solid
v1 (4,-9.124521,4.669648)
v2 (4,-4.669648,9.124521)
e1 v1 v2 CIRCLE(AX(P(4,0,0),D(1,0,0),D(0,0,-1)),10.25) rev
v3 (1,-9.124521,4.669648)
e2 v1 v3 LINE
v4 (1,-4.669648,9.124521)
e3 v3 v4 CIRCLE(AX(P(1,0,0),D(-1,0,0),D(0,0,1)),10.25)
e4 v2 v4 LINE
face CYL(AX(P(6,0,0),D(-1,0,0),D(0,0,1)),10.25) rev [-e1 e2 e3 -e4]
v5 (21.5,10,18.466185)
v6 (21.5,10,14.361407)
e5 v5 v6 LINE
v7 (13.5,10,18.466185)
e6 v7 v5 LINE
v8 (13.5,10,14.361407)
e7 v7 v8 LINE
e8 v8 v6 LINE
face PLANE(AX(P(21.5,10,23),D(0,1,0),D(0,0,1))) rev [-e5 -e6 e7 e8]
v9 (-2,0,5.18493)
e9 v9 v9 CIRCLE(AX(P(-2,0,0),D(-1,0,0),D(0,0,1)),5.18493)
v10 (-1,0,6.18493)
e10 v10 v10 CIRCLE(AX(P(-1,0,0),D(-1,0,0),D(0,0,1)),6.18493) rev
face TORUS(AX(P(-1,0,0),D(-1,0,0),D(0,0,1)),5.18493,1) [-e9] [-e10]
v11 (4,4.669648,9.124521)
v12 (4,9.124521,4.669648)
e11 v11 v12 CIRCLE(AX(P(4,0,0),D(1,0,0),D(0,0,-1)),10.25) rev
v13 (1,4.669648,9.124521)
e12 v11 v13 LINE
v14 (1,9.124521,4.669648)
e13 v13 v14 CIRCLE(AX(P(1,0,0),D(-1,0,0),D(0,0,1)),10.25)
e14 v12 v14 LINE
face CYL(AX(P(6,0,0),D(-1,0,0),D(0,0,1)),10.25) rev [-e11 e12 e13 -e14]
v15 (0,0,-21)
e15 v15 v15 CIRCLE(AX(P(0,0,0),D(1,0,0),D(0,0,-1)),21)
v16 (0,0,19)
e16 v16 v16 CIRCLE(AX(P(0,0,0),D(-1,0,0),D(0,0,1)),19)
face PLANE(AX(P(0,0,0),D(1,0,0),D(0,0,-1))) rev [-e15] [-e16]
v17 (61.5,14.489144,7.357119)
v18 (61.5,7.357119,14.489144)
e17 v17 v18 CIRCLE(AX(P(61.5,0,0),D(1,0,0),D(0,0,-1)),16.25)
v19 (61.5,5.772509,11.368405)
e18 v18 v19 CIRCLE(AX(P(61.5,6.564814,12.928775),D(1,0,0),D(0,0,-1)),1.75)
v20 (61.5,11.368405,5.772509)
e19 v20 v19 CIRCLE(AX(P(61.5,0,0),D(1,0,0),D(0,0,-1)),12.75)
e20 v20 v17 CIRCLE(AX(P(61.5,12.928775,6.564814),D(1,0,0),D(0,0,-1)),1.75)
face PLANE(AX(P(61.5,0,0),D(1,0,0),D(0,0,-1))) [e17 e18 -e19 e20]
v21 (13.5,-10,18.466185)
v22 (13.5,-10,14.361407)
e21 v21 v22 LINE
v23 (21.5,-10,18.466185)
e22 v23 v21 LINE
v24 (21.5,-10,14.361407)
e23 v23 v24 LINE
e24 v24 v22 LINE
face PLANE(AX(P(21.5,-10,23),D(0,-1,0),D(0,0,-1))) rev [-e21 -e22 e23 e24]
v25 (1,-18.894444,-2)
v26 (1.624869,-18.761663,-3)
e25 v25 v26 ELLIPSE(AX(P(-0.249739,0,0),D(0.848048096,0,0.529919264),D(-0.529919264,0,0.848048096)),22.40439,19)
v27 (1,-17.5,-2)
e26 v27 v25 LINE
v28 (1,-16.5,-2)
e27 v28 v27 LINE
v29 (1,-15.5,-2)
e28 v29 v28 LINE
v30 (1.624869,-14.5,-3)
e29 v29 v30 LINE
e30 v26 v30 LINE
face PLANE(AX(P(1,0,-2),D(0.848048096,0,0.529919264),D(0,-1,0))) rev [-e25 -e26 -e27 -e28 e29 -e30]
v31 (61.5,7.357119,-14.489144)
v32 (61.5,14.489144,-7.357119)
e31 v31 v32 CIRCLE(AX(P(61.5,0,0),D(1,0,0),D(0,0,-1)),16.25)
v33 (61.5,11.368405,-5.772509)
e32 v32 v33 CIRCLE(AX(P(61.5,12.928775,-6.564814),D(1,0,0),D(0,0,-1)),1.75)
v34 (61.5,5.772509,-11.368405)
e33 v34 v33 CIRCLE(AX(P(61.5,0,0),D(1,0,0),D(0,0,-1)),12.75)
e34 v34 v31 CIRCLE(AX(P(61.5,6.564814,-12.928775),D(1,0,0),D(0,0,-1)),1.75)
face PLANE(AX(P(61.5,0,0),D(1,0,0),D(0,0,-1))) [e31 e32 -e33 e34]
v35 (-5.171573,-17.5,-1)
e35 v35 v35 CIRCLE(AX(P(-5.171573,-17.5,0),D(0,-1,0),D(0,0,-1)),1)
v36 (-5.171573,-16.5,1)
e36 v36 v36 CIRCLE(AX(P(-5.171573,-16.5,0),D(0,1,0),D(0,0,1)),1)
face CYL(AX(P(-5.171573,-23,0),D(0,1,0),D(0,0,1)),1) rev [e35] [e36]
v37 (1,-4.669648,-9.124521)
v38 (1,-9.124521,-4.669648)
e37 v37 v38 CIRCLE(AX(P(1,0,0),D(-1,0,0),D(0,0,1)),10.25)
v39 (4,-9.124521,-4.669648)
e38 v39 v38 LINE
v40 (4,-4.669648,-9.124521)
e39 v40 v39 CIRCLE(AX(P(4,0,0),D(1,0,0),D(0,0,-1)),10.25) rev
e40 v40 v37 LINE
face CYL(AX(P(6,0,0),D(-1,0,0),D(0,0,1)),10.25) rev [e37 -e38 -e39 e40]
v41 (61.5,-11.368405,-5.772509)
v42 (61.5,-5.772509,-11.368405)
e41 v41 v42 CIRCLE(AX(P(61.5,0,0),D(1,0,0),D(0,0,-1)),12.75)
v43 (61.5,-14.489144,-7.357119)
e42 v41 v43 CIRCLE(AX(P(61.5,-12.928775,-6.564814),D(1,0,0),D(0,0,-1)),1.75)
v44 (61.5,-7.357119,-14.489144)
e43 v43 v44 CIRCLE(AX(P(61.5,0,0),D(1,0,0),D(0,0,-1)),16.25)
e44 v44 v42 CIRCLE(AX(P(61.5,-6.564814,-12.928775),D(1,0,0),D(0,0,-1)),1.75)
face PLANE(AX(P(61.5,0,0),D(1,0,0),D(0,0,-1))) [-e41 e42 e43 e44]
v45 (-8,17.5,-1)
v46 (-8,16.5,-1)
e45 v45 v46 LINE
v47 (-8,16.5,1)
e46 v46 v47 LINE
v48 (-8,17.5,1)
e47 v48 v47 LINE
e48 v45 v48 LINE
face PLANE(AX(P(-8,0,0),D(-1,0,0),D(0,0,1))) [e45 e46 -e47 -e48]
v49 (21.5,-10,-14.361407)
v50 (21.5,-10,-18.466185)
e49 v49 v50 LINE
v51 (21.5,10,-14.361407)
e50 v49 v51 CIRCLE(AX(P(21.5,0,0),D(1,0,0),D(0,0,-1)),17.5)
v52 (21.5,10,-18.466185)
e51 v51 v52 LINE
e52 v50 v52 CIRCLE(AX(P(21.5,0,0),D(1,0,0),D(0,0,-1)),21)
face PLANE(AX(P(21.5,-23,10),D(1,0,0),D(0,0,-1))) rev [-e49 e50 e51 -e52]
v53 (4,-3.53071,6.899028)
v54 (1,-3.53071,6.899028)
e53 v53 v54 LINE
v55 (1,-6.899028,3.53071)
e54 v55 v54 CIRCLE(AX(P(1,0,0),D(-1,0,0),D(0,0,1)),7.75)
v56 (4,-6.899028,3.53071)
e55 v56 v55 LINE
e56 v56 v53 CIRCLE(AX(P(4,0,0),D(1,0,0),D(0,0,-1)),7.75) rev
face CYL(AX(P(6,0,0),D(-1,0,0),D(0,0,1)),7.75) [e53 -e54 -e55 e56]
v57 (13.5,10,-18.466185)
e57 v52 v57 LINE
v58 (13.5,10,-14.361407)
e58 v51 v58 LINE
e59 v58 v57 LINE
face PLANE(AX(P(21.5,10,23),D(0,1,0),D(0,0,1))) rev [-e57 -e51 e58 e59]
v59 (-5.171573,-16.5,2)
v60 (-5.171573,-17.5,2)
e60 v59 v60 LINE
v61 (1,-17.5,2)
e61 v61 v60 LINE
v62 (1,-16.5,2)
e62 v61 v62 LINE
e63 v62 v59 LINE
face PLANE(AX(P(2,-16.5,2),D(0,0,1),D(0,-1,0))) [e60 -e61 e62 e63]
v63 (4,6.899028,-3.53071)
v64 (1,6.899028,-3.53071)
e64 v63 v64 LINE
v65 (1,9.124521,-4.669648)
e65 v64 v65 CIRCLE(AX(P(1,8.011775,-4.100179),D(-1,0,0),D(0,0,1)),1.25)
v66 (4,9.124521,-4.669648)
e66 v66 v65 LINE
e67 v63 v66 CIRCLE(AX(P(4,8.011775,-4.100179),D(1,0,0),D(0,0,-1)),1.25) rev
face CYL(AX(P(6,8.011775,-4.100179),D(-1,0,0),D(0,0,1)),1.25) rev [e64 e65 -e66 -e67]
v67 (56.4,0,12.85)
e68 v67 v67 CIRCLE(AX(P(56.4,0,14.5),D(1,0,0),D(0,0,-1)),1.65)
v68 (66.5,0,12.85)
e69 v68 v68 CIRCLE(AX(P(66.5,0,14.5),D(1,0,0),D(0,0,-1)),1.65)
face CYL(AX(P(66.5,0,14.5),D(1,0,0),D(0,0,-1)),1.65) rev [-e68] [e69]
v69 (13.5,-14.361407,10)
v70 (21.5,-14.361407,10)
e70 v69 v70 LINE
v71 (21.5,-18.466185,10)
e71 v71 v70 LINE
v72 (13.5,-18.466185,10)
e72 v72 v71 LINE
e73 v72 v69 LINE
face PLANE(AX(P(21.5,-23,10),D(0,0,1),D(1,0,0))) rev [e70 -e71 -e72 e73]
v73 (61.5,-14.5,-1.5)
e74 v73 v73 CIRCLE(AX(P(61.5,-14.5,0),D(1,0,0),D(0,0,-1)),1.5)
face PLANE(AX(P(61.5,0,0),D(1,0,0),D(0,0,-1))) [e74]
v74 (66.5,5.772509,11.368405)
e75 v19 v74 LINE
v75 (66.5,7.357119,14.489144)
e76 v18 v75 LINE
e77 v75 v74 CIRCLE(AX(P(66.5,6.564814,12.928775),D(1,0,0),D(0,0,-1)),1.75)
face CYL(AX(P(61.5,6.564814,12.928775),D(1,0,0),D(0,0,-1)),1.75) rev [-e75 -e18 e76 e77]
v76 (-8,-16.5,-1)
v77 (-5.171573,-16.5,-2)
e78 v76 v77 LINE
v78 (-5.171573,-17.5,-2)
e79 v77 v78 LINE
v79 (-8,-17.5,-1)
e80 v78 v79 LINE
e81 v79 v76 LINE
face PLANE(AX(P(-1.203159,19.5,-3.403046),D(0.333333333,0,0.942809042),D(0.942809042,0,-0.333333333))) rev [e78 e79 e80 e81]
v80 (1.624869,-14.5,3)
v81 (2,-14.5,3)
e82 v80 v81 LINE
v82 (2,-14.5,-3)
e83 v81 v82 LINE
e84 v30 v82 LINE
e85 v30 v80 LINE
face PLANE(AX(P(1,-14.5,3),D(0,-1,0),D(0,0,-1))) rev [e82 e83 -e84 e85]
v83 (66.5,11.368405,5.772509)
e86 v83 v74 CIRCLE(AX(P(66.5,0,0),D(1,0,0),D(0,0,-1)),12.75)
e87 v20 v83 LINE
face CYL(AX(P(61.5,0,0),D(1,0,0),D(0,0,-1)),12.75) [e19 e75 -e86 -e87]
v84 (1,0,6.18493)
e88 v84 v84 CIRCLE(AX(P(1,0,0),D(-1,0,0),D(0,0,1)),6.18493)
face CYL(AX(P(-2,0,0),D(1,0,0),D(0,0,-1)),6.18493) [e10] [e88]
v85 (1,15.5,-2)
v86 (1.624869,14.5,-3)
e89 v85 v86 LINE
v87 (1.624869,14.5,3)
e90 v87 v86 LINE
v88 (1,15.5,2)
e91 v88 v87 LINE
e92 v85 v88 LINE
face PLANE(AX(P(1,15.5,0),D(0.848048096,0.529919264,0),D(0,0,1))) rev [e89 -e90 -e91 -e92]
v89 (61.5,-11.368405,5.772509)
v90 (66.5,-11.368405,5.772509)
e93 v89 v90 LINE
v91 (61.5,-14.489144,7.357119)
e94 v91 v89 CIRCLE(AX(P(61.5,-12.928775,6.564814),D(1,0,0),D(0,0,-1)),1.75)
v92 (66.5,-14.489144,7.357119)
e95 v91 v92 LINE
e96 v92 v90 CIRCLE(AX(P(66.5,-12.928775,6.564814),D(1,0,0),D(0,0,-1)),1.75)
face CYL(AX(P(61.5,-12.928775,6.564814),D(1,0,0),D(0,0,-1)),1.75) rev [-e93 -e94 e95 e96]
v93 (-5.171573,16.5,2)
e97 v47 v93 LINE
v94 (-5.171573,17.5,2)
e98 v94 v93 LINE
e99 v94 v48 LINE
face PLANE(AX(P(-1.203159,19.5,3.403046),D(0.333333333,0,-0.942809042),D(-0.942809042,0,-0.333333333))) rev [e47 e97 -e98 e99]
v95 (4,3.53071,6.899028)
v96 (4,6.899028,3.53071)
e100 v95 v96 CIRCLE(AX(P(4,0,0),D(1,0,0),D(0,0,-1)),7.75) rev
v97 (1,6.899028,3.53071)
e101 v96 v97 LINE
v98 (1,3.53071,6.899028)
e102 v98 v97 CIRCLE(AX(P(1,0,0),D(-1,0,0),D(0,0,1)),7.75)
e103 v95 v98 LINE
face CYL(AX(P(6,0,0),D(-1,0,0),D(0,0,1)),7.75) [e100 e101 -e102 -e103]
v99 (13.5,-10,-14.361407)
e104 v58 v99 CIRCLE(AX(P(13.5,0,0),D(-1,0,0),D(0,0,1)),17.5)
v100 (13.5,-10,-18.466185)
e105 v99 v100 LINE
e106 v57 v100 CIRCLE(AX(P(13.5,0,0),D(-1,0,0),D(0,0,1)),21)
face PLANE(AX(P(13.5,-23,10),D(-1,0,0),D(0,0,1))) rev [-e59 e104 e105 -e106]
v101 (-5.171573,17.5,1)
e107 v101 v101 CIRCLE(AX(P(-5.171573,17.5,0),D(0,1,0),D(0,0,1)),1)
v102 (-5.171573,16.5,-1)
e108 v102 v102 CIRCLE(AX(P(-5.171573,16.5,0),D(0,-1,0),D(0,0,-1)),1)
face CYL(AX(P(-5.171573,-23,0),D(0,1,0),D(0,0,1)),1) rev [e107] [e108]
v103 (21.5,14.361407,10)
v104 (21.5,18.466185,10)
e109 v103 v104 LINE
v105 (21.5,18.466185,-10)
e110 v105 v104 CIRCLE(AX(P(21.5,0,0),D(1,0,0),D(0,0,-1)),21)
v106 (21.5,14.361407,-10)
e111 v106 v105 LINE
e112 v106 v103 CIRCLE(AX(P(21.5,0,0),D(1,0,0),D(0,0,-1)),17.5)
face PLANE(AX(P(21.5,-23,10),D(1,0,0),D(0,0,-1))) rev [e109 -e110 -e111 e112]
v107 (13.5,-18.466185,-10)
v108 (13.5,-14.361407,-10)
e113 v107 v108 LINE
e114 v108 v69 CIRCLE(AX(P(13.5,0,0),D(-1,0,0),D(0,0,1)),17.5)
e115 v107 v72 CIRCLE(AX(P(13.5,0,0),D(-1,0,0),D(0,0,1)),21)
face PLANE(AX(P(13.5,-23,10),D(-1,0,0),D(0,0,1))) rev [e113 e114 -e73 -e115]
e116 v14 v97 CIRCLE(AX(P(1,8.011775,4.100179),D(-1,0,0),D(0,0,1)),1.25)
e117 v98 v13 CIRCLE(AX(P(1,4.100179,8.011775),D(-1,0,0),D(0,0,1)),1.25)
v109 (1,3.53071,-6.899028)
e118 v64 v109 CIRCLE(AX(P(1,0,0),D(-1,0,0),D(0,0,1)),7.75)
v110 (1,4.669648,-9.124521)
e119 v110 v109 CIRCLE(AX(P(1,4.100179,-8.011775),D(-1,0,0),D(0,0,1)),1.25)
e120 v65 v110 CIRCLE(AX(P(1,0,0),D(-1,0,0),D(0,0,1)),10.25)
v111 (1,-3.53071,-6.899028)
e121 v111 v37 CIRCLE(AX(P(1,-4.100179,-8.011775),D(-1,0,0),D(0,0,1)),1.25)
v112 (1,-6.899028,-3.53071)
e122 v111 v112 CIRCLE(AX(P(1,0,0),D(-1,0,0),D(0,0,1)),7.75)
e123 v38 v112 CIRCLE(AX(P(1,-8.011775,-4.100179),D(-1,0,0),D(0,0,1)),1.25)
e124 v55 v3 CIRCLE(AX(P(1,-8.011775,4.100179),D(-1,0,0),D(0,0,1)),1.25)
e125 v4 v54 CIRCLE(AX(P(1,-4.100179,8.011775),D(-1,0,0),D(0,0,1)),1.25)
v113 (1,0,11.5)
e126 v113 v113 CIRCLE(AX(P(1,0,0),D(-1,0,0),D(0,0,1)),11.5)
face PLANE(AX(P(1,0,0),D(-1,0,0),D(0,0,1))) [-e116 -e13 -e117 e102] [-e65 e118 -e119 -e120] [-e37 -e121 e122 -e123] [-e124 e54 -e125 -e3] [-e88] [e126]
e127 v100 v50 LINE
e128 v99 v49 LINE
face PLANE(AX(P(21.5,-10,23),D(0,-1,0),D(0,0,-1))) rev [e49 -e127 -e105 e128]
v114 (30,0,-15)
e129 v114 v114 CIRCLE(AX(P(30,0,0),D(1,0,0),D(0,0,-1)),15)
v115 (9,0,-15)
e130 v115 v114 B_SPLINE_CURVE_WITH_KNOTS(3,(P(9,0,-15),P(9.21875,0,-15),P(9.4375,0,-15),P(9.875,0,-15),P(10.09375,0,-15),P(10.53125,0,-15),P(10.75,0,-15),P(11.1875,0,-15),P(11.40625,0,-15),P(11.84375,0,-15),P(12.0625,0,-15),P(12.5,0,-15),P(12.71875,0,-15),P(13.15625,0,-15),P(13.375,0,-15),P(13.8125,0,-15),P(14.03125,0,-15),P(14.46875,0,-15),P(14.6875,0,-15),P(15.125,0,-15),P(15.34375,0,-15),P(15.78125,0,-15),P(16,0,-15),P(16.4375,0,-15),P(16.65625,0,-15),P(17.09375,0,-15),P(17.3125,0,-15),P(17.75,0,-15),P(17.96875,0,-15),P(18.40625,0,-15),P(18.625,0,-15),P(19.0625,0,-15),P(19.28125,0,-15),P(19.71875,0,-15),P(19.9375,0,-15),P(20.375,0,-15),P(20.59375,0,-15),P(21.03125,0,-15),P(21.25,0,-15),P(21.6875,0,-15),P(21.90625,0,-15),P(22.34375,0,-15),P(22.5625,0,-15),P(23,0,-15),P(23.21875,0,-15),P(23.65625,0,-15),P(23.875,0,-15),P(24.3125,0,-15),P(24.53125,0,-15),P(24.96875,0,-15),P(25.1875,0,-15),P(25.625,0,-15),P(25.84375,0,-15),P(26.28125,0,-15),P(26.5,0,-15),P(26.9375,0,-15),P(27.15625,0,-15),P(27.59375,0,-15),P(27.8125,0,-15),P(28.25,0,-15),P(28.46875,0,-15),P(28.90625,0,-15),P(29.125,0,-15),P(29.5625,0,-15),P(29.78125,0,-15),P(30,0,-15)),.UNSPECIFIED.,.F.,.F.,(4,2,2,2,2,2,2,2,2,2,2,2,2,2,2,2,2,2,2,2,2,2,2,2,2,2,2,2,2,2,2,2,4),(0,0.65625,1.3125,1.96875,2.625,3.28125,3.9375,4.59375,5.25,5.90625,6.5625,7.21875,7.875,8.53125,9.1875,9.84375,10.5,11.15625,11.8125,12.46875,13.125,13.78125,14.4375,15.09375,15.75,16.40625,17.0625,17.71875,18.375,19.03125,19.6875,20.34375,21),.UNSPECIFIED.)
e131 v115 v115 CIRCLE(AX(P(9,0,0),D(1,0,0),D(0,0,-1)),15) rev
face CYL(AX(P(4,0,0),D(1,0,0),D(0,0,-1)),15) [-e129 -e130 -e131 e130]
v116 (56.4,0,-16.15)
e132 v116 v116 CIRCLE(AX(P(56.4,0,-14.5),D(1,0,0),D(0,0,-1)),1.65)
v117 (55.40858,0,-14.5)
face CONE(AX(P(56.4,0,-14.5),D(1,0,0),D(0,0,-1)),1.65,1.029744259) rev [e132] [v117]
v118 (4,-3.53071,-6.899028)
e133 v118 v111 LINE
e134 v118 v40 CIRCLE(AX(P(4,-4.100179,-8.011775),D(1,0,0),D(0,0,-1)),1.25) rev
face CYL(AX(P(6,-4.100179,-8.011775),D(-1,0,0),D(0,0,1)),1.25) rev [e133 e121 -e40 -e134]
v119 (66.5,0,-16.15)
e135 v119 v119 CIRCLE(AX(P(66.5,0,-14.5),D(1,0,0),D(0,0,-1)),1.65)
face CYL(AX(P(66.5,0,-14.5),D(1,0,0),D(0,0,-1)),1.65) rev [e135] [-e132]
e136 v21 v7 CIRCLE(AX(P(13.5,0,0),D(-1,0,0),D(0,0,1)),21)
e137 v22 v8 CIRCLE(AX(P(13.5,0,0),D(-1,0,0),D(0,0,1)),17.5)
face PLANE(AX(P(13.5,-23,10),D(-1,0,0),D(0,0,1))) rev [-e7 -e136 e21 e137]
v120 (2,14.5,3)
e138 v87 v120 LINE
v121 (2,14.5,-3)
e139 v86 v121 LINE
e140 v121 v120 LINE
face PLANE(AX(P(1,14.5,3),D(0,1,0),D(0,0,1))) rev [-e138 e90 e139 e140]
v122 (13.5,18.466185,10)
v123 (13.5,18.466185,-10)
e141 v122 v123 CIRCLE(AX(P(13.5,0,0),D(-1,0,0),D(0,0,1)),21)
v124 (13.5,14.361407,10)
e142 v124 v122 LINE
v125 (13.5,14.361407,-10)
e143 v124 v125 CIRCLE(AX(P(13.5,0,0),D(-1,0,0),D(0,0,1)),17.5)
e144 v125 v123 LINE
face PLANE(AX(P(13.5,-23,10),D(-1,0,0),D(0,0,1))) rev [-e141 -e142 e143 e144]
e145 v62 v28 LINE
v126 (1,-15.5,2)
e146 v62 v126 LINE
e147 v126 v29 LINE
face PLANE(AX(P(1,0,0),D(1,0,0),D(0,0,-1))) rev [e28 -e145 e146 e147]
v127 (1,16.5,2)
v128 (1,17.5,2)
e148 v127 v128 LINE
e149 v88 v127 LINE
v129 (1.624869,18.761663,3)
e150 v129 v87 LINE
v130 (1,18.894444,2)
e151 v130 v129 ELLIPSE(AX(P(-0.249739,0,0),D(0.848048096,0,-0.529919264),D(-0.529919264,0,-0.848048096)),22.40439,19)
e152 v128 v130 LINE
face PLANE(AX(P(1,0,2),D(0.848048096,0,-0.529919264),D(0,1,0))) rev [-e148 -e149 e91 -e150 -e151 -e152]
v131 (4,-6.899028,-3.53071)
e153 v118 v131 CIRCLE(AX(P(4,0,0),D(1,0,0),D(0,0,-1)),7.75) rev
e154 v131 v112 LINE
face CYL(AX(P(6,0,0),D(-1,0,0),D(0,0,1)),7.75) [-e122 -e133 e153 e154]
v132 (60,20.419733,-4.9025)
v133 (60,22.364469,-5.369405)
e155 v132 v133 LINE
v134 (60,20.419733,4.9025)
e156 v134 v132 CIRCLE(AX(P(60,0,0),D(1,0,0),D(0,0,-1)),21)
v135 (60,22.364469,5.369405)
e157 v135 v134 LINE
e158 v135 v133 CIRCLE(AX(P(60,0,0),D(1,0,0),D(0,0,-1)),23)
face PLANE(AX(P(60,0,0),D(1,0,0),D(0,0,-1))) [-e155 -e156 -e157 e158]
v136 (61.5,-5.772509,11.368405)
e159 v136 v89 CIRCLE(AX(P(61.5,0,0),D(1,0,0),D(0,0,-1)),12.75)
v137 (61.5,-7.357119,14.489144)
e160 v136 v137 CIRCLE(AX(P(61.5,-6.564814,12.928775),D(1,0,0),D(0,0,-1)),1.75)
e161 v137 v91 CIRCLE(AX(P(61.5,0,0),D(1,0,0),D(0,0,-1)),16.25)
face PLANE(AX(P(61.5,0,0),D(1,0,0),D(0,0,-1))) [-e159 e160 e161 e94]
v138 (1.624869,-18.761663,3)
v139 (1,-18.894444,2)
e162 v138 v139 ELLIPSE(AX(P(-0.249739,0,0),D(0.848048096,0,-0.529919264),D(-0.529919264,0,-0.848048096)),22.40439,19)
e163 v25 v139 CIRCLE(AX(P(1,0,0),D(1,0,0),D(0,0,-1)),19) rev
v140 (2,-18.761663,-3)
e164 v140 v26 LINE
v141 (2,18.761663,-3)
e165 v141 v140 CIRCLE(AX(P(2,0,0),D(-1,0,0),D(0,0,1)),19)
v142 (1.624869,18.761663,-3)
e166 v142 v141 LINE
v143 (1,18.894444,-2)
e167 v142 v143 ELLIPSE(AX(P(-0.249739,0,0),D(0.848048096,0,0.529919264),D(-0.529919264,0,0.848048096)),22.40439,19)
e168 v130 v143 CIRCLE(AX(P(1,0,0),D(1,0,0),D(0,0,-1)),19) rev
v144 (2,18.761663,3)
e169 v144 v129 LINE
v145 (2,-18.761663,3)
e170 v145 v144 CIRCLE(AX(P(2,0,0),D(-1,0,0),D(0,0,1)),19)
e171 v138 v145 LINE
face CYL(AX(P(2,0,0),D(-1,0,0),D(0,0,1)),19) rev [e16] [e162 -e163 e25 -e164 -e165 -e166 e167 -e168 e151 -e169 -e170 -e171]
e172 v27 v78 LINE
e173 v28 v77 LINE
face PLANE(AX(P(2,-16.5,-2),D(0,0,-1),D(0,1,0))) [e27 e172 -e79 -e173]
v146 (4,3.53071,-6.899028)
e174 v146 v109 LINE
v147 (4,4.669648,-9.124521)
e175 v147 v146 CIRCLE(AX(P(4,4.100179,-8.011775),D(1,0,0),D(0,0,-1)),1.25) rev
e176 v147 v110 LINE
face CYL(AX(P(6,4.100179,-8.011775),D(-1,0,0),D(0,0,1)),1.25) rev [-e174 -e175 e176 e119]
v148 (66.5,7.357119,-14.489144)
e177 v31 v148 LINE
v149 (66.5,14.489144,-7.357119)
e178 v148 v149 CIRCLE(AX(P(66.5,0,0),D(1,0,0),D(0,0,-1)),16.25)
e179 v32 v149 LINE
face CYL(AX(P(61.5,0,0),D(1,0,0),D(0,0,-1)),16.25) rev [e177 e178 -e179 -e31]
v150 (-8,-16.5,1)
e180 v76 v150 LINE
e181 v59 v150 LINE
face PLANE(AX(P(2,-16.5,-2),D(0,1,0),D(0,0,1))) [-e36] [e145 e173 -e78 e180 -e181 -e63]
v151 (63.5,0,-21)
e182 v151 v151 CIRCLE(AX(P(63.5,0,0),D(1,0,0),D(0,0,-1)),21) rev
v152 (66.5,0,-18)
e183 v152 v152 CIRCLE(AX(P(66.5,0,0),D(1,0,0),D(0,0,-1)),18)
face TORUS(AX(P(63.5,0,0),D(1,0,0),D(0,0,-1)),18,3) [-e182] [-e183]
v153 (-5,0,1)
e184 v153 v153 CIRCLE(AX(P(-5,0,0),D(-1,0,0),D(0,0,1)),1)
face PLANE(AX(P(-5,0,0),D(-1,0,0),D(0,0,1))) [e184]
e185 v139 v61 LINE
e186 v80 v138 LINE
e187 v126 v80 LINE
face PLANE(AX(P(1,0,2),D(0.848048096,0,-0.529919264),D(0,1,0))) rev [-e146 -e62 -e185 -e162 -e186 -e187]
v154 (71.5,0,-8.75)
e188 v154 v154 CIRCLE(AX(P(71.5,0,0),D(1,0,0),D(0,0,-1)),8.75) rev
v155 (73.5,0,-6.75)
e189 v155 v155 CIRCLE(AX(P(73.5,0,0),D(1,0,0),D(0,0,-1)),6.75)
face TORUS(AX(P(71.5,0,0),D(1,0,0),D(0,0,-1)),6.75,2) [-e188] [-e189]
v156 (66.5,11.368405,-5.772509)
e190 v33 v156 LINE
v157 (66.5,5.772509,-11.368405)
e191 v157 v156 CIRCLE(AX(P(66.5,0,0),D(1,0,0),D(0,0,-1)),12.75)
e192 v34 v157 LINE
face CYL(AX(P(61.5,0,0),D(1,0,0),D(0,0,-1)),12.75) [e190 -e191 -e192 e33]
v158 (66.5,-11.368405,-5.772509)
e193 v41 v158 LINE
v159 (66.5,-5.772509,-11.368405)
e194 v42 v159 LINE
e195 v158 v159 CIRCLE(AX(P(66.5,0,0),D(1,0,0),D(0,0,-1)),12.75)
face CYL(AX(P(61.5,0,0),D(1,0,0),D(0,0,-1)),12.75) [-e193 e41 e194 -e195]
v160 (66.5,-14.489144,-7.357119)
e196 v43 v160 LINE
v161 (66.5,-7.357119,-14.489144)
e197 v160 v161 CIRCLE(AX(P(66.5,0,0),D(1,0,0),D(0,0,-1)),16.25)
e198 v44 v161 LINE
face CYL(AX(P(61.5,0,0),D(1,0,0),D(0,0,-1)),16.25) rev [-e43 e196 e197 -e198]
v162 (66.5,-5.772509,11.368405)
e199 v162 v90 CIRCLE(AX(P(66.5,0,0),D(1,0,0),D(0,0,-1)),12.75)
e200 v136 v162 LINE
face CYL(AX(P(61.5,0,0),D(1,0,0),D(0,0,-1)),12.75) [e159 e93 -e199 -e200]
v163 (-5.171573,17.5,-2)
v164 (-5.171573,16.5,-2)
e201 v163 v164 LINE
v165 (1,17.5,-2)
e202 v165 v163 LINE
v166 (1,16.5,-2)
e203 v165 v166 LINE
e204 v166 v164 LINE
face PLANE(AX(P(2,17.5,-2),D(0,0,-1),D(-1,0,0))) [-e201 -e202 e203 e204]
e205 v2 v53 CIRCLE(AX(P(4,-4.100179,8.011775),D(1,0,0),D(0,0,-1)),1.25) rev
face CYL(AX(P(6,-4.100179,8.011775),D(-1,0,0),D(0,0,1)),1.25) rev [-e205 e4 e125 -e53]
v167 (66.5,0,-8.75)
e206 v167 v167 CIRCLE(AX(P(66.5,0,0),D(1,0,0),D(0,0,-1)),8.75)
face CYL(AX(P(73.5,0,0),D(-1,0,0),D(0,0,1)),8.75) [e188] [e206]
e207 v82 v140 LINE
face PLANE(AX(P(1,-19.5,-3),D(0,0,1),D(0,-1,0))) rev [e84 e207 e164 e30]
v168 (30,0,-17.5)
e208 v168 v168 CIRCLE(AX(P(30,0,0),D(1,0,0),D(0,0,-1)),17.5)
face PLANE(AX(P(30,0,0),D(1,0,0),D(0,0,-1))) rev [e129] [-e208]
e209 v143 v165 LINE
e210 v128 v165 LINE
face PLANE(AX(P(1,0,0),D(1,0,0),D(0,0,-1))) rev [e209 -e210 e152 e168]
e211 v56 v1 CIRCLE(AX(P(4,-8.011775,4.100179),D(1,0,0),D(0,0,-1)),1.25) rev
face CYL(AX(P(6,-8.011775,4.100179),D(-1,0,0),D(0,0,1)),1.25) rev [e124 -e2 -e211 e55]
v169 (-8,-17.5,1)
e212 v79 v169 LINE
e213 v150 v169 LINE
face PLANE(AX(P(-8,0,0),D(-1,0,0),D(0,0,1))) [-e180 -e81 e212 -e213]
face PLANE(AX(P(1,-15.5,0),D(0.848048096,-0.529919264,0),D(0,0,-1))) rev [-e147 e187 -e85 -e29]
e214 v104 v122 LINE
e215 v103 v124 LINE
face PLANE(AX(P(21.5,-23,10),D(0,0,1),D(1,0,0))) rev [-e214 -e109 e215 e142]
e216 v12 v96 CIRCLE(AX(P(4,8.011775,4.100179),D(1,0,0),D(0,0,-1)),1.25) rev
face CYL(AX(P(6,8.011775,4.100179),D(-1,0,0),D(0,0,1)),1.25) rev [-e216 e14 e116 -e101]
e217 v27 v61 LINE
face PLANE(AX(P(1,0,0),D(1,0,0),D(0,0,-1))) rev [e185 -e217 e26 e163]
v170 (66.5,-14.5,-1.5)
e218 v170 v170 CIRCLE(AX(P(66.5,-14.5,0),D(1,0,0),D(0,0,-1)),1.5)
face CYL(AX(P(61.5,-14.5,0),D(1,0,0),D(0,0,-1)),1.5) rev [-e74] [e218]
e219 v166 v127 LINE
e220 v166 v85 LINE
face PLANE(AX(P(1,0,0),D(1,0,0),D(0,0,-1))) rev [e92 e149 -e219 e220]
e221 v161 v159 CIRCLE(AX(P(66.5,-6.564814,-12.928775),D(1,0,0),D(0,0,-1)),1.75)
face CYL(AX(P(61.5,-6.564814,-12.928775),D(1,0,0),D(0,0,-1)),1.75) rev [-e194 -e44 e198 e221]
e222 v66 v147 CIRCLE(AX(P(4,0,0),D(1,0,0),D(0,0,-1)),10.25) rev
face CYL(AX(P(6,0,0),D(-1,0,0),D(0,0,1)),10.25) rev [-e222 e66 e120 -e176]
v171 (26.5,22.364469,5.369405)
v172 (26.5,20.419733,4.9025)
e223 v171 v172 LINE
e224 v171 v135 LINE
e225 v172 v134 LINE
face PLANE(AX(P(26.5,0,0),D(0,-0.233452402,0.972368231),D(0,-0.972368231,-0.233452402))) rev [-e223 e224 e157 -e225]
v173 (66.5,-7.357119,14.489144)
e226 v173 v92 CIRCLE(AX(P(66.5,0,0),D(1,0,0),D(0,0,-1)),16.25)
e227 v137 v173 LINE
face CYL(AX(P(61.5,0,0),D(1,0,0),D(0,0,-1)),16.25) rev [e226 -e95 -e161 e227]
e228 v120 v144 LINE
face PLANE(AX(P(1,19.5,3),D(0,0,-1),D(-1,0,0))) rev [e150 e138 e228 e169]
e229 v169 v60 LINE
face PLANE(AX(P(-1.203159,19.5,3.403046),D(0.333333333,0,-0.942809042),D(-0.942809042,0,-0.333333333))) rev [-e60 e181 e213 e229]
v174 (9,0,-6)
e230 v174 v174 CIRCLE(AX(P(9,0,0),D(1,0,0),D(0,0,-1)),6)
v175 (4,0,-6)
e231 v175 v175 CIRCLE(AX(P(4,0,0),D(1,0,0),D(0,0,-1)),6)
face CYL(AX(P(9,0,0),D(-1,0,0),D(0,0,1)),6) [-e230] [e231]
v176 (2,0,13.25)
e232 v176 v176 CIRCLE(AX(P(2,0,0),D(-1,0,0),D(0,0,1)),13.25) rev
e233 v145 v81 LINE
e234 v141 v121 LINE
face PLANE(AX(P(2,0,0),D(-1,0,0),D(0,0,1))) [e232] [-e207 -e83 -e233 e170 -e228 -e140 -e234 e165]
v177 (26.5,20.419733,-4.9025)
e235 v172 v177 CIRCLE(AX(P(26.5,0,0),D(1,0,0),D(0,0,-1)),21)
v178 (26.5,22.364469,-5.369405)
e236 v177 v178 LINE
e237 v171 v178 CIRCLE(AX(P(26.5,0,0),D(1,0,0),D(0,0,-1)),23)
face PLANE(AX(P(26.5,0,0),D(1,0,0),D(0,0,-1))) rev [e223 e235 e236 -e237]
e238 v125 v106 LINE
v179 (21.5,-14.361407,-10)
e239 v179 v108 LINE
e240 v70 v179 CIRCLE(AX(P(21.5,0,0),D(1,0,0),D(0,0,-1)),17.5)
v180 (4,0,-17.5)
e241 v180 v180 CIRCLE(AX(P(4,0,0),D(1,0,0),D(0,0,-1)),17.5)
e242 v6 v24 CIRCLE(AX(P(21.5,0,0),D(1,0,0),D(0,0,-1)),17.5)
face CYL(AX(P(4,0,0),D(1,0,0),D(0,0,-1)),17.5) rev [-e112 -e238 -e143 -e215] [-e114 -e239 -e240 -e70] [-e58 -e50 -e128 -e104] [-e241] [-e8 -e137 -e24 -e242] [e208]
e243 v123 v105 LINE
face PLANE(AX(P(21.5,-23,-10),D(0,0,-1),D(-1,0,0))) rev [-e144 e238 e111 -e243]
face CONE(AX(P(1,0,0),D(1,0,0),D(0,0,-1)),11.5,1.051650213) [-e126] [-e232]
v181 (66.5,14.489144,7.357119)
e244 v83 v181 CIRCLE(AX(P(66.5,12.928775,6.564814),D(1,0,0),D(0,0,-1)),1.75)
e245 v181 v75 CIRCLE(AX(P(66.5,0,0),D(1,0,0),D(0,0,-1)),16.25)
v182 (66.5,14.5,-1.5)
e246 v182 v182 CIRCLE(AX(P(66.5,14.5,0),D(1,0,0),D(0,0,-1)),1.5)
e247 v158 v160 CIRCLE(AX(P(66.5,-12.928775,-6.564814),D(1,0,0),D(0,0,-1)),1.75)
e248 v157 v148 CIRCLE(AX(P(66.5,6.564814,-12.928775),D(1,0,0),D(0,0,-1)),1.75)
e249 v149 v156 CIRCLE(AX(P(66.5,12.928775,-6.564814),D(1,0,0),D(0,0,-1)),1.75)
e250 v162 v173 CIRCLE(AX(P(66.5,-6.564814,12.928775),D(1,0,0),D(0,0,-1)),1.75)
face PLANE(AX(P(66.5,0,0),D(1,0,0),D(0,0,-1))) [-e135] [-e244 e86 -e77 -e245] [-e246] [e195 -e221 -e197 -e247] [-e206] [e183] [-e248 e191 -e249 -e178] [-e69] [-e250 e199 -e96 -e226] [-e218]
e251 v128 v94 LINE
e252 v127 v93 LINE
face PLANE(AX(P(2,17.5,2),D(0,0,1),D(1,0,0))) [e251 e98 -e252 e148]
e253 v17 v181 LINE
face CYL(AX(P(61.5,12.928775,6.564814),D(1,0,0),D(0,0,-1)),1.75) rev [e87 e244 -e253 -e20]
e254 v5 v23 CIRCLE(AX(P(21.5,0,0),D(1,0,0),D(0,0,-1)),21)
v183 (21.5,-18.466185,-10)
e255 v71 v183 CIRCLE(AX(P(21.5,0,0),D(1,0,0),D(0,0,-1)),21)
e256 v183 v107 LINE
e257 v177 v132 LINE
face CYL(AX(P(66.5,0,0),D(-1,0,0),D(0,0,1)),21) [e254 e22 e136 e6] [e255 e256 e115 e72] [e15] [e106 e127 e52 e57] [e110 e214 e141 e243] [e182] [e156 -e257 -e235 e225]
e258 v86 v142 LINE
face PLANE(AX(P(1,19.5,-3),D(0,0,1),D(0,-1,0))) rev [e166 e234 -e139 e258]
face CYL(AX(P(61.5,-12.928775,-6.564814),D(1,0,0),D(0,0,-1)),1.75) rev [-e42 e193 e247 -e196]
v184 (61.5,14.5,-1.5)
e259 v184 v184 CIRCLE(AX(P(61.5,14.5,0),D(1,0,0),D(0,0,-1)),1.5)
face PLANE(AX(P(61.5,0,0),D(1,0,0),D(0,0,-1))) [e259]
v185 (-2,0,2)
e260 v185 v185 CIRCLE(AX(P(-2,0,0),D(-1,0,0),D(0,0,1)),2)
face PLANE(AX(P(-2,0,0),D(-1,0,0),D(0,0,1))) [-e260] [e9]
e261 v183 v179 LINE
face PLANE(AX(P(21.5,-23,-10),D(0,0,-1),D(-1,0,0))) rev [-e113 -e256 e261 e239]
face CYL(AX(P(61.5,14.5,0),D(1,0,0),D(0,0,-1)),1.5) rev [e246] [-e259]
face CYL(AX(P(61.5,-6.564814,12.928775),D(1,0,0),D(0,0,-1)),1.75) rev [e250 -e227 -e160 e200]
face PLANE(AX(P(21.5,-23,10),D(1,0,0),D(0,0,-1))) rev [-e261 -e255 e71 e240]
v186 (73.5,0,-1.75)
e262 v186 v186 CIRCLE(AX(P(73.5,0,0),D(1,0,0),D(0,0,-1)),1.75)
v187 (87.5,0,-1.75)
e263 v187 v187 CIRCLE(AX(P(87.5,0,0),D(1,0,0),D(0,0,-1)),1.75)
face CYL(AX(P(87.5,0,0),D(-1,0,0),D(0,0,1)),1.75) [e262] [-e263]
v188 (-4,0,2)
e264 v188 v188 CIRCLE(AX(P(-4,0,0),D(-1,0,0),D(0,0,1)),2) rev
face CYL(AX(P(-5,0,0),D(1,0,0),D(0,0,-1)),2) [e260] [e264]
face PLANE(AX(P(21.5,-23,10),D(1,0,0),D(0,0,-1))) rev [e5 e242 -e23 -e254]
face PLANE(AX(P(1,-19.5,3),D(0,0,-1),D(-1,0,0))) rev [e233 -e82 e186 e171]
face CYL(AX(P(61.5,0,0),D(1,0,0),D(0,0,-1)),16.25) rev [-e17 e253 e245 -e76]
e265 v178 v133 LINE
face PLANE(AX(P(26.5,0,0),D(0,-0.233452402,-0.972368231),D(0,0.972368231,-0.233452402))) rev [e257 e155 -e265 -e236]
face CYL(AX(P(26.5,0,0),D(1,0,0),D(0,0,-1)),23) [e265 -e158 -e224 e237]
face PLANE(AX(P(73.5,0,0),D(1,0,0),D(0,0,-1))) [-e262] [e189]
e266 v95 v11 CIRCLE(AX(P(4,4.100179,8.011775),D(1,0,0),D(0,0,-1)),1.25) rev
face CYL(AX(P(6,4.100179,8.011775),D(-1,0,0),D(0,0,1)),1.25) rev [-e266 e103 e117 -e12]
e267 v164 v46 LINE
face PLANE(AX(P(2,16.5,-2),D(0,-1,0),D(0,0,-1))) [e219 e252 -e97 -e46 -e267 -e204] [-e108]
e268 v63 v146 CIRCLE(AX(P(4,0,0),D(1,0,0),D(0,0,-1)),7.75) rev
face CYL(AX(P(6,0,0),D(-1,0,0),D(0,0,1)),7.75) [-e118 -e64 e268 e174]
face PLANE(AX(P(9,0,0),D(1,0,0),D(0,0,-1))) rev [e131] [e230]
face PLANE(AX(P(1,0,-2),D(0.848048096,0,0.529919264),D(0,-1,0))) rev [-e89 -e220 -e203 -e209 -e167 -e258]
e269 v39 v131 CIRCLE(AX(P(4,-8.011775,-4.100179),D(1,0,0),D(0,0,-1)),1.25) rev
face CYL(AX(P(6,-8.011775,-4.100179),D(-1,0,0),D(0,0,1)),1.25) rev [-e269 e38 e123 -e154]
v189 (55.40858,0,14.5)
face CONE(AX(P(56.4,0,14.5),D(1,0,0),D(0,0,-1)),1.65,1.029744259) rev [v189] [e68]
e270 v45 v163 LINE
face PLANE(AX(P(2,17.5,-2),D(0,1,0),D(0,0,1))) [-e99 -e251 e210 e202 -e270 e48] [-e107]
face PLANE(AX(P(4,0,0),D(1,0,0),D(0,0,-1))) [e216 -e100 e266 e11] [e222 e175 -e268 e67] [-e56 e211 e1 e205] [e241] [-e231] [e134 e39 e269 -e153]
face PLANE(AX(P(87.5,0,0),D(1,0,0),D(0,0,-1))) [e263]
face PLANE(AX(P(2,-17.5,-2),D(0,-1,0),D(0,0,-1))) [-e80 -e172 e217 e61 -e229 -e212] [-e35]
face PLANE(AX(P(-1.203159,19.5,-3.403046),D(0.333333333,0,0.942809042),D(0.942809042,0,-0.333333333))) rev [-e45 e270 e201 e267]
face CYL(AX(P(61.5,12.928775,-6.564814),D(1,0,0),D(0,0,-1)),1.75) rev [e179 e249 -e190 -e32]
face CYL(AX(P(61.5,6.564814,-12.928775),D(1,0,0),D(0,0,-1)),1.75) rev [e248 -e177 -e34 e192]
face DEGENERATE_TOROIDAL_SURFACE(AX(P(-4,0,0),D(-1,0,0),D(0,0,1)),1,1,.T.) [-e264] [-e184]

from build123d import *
from OCP.BRepFilletAPI import BRepFilletAPI_MakeChamfer

# Parameters (mm, degrees)
SKETCH1_R               = 21
BOSS_EXTRUDE1_DEPTH     = 66.5
FILLET1_R               = 3
SKETCH2_R               = 8.75
BOSS_EXTRUDE2_DEPTH     = 7
FILLET2_R               = 2
SKETCH3_R               = 1.75
BOSS_EXTRUDE3_DEPTH     = 14
BOSS_EXTRUDE4_START     = -33.5
BOSS_EXTRUDE4_DEPTH     = 33.5
SKETCH5_R               = 19
SKETCH5_W               = 4
SKETCH5_H               = 1
CUT_EXTRUDE1_DEPTH      = 2
SKETCH5_3_W             = 4
SKETCH5_3_H             = 1
BOSS_EXTRUDE5_DEPTH     = 8
CUT_EXTRUDE2_DEPTH      = 37
SKETCH7_W               = 8
SKETCH7_H               = 20
CUT_EXTRUDE3_DEPTH      = 101.604423362
CIRPATTERN1_COUNT       = 2
CIRPATTERN1_ANGLE       = 90
SKETCH9_R               = 17.5
BOSS_EXTRUDE6_DEPTH     = 64.5
CUT_EXTRUDE4_DEPTH      = 100.123660142
CUT_EXTRUDE4_DEPTH_BACK = 100.123660142
SKETCH10_R              = 1
M4_TAPPED_HOLE1_D       = 3.3
M4_TAPPED_HOLE1_DEPTH   = 10.1
M4_TAPPED_HOLE1_TIP     = 0.991420021
SKETCH11_R              = 1.5
CUT_EXTRUDE6_DEPTH      = 5
SKETCH13_R              = 15
BOSS_EXTRUDE7_DEPTH     = 1
CHAMFER1_SIZE           = 2
CHAMFER1_SIZE_2         = 3.5
SKETCH15_W              = 6
SKETCH15_H              = 5
BOSS_EXTRUDE8_DEPTH     = 1
CHAMFER2_SIZE           = 1
CHAMFER2_SIZE_2         = 0.624869352
SKETCH17_R              = 6.184929539
BOSS_EXTRUDE9_DEPTH     = 3
FILLET3_R               = 1
SKETCH19_R              = 2
BOSS_EXTRUDE10_DEPTH    = 3
FILLET4_R               = 1
CUT_EXTRUDE7_DEPTH      = 5
CUT_EXTRUDE8_START      = -26
SKETCH22_R              = 17.5
SKETCH22_R_2            = 15
CUT_EXTRUDE8_DEPTH      = 26
SKETCH23_R              = 17.5
SKETCH23_R_2            = 6
CUT_EXTRUDE9_DEPTH      = 5


# Some blends are built 0.0001 mm under size
with BuildPart() as part:
    # Sketch1 → Boss-Extrude1 (new body)
    with BuildSketch(Plane(origin=(0, 0, 0), x_dir=(0, 0, -1), z_dir=(1, 0, 0))):
        Circle(SKETCH1_R)
    extrude(amount=BOSS_EXTRUDE1_DEPTH)

    # Fillet1
    fillet1_edges = [part.edges().sort_by_distance(p)[0] for p in [
        (66.5, 0, 21),
    ]]
    fillet(fillet1_edges, radius=FILLET1_R)

    # Sketch2 → Boss-Extrude2 (add)
    with BuildSketch(Plane(origin=(66.5, 0, 0), x_dir=(0, 0, -1), z_dir=(1, 0, 0))):
        Circle(SKETCH2_R)
    extrude(amount=BOSS_EXTRUDE2_DEPTH)

    # Fillet2
    fillet2_edges = [part.edges().sort_by_distance(p)[0] for p in [
        (73.5, 0, 8.75),
    ]]
    fillet(fillet2_edges, radius=FILLET2_R)

    # Sketch3 → Boss-Extrude3 (add)
    with BuildSketch(Plane(origin=(73.5, 0, 0), x_dir=(0, 0, -1), z_dir=(1, 0, 0))):
        Circle(SKETCH3_R)
    extrude(amount=BOSS_EXTRUDE3_DEPTH)

    # Sketch4 → Boss-Extrude4 (add)
    with BuildSketch(Plane(origin=(60, 0, 0), x_dir=(0, 0, -1), z_dir=(1, 0, 0)).offset(BOSS_EXTRUDE4_START)):
        with BuildLine():
            Line((-4.902500441, 20.419732844), (-5.369405245, 22.364469305))
            ThreePointArc((-5.369405245, 22.364469305), (-14.239095466, -18.062340942), (23, 0))
            ThreePointArc((23, 0), (18.062340942, 14.239095466), (5.369405245, 22.364469305))
            Line((5.369405245, 22.364469305), (4.902500441, 20.419732844))
            ThreePointArc((4.902500441, 20.419732844), (16.491702599, 13.000913251), (21, 0))
            ThreePointArc((21, 0), (-13.000913251, -16.491702599), (-4.902500441, 20.419732844))
        make_face()
    extrude(amount=BOSS_EXTRUDE4_DEPTH)

    # Sketch5 → Cut-Extrude1 (cut)
    with BuildSketch(Plane.ZY):
        Circle(SKETCH5_R)
        with Locations((0, 17)):
            Rectangle(SKETCH5_W, SKETCH5_H, mode=Mode.SUBTRACT)
        with Locations((0, -17)):
            Rectangle(SKETCH5_W, SKETCH5_H, mode=Mode.SUBTRACT)
    extrude(amount=-CUT_EXTRUDE1_DEPTH, mode=Mode.SUBTRACT)

    # Sketch5<3> → Boss-Extrude5 (add)
    with BuildSketch(Plane.ZY):
        with Locations((0, 17)):
            Rectangle(SKETCH5_3_W, SKETCH5_3_H)
        with Locations((0, -17)):
            Rectangle(SKETCH5_3_W, SKETCH5_3_H)
    extrude(amount=BOSS_EXTRUDE5_DEPTH)

    # Sketch6 → Cut-Extrude2 (cut)
    with BuildSketch(Plane.XZ.offset(17.5)):
        Polygon((-8, -2), (-5.171572875, -2), (-8, -1), align=None)
        Polygon((-8, 2), (-8, 1), (-5.171572875, 2), align=None)
    extrude(amount=-CUT_EXTRUDE2_DEPTH, mode=Mode.SUBTRACT)

    # Sketch7 → Cut-Extrude3 (cut, through all)
    with BuildSketch(Plane(origin=(0, 21, 0), x_dir=(1, 0, 0), z_dir=(0, 1, 0))):
        with Locations((17.5, 0)):
            Rectangle(SKETCH7_W, SKETCH7_H)
    cut_extrude3 = extrude(amount=-CUT_EXTRUDE3_DEPTH, mode=Mode.SUBTRACT)

    # CirPattern1: Cut-Extrude3 ×2 about axis
    cirpattern1_axis = Axis((0, 0, 0), (-1, 0, 0))
    for i in range(1, CIRPATTERN1_COUNT):
        add(cut_extrude3.rotate(cirpattern1_axis, i * CIRPATTERN1_ANGLE / (CIRPATTERN1_COUNT - 1)), mode=Mode.SUBTRACT)

    # Sketch9 → Boss-Extrude6 (add)
    with BuildSketch(Plane.ZY.offset(-2)):
        Circle(SKETCH9_R)
    extrude(amount=-BOSS_EXTRUDE6_DEPTH)

    # Sketch10 → Cut-Extrude4 (cut, two sides: drawn at the far end of the back side and taken through both)
    with BuildSketch(Plane(origin=(0, 17.5, 0), x_dir=(1, 0, 0), z_dir=(0, 1, 0)).offset(-CUT_EXTRUDE4_DEPTH_BACK)):
        with Locations(Location((-5.171572875, 0, 0), (0, 0, 270))):
            Circle(SKETCH10_R)
    extrude(amount=CUT_EXTRUDE4_DEPTH + CUT_EXTRUDE4_DEPTH_BACK, mode=Mode.SUBTRACT)

    # M4 Tapped Hole1
    with Locations(Plane(origin=(66.5, 0, 14.5), x_dir=(0, 0, 1), z_dir=(1, 0, 0))):
        with Locations((0, 0), (-29, 0)):
            Hole(M4_TAPPED_HOLE1_D / 2, depth=M4_TAPPED_HOLE1_DEPTH)
            with Locations((0, 0, -(M4_TAPPED_HOLE1_DEPTH + M4_TAPPED_HOLE1_TIP / 2))):  # 118° drill point
                Cone(0, M4_TAPPED_HOLE1_D / 2, M4_TAPPED_HOLE1_TIP, mode=Mode.SUBTRACT)

    # Sketch11 → Cut-Extrude6 (cut)
    with BuildSketch(Plane(origin=(66.5, 0, 0), x_dir=(0, 0, -1), z_dir=(1, 0, 0))):
        with Locations((0, -14.5)):
            Circle(SKETCH11_R)
        with Locations((0, 14.5)):
            Circle(SKETCH11_R)
        with BuildLine():
            ThreePointArc((-7.357118947, 14.48914424), (-11.490485194, 11.490485194), (-14.48914424, 7.357118947))
            ThreePointArc((-14.48914424, 7.357118947), (-13.721079977, 5.00444445), (-11.36840548, 5.772508712))
            ThreePointArc((-11.36840548, 5.772508712), (-9.01561146, 9.01561146), (-5.772508712, 11.36840548))
            ThreePointArc((-5.772508712, 11.36840548), (-5.00444445, 13.721079977), (-7.357118947, 14.48914424))
        make_face()
        with BuildLine():
            ThreePointArc((14.48914424, 7.357118947), (11.490485194, 11.490485194), (7.357118947, 14.48914424))
            ThreePointArc((7.357118947, 14.48914424), (5.00444445, 13.721079977), (5.772508712, 11.36840548))
            ThreePointArc((5.772508712, 11.36840548), (9.01561146, 9.01561146), (11.36840548, 5.772508712))
            ThreePointArc((11.36840548, 5.772508712), (13.721079977, 5.00444445), (14.48914424, 7.357118947))
        make_face()
        with BuildLine():
            ThreePointArc((7.357118947, -14.48914424), (11.490485194, -11.490485194), (14.48914424, -7.357118947))
            ThreePointArc((14.48914424, -7.357118947), (13.721079977, -5.00444445), (11.36840548, -5.772508712))
            ThreePointArc((11.36840548, -5.772508712), (9.01561146, -9.01561146), (5.772508712, -11.36840548))
            ThreePointArc((5.772508712, -11.36840548), (5.00444445, -13.721079977), (7.357118947, -14.48914424))
        make_face()
        with BuildLine():
            ThreePointArc((-14.48914424, -7.357118947), (-11.490485194, -11.490485194), (-7.357118947, -14.48914424))
            ThreePointArc((-7.357118947, -14.48914424), (-5.00444445, -13.721079977), (-5.772508712, -11.36840548))
            ThreePointArc((-5.772508712, -11.36840548), (-9.01561146, -9.01561146), (-11.36840548, -5.772508712))
            ThreePointArc((-11.36840548, -5.772508712), (-13.721079977, -5.00444445), (-14.48914424, -7.357118947))
        make_face()
    extrude(amount=-CUT_EXTRUDE6_DEPTH, mode=Mode.SUBTRACT)

    # Sketch13 → Boss-Extrude7 (add)
    with BuildSketch(Plane.ZY.offset(-2)):
        Circle(SKETCH13_R)
    extrude(amount=BOSS_EXTRUDE7_DEPTH)

    # Chamfer1
    # the kernel refuses this chamfer: 3.5, 2 mm, written as the material it takes off along each edge
    with BuildSketch(Plane(origin=(1, 0, 0), x_dir=(0, 0, 1), z_dir=(0, -1, 0))) as chamfer1_piece_1_section:
        Polygon((15, -CHAMFER1_SIZE), (15 - CHAMFER1_SIZE_2, 0), (15, 0), align=None)
    chamfer1_piece_1 = revolve(axis=Axis((1, 0, 0), (-1, 0, 0)), mode=Mode.PRIVATE)
    chamfer1_piece_1 = split(chamfer1_piece_1, bisect_by=Plane(origin=(2, 0, -12.345664859), z_dir=(-1, 0, 0)), keep=Keep.TOP, mode=Mode.PRIVATE)
    add(chamfer1_piece_1, mode=Mode.SUBTRACT)

    # Sketch15 → Boss-Extrude8 (add)
    with BuildSketch(Plane.ZY.offset(-2)):
        with Locations((0, 17)):
            Rectangle(SKETCH15_W, SKETCH15_H)
        with Locations((0, -17)):
            Rectangle(SKETCH15_W, SKETCH15_H)
    extrude(amount=BOSS_EXTRUDE8_DEPTH)

    # Chamfer2
    chamfer2_edges_1 = [part.edges().sort_by_distance(p)[0] for p in [
        (1, 16.63083152, 3),
    ]]
    chamfer2_side_1 = [part.faces().sort_by_distance(p)[0] for p in [
        (1, 16.63083152, 2.987502613),
    ]]
    chamfer2_edges_2 = [part.edges().sort_by_distance(p)[0] for p in [
        (1, 16.63083152, -3),
    ]]
    chamfer2_side_2 = [part.faces().sort_by_distance(p)[0] for p in [
        (1.012497387, 16.63083152, -3),
    ]]
    chamfer2_edges_3 = [part.edges().sort_by_distance(p)[0] for p in [
        (1, 14.5, 0),
    ]]
    chamfer2_side_3 = [part.faces().sort_by_distance(p)[0] for p in [
        (1, 14.512497387, 0),
    ]]
    chamfer2_edges_4 = [part.edges().sort_by_distance(p)[0] for p in [
        (1, -16.63083152, -3),
    ]]
    chamfer2_side_4 = [part.faces().sort_by_distance(p)[0] for p in [
        (1, -16.63083152, -2.987502613),
    ]]
    chamfer2_edges_5 = [part.edges().sort_by_distance(p)[0] for p in [
        (1, -16.63083152, 3),
    ]]
    chamfer2_side_5 = [part.faces().sort_by_distance(p)[0] for p in [
        (1.012497387, -16.63083152, 3),
    ]]
    chamfer2_edges_6 = [part.edges().sort_by_distance(p)[0] for p in [
        (1, -14.5, 0),
    ]]
    chamfer2_side_6 = [part.faces().sort_by_distance(p)[0] for p in [
        (1, -14.512497387, 0),
    ]]
    chamfer2 = BRepFilletAPI_MakeChamfer(part.part.solid().wrapped)
    for e in chamfer2_edges_1:
        chamfer2.Add(CHAMFER2_SIZE - 0.0001, CHAMFER2_SIZE_2 - 0.0001, e.wrapped, chamfer2_side_1[0].wrapped)
    for e in chamfer2_edges_2:
        chamfer2.Add(CHAMFER2_SIZE_2 - 0.0001, CHAMFER2_SIZE - 0.0001, e.wrapped, chamfer2_side_2[0].wrapped)
    for e in chamfer2_edges_3:
        chamfer2.Add(CHAMFER2_SIZE - 0.0001, CHAMFER2_SIZE_2 - 0.0001, e.wrapped, chamfer2_side_3[0].wrapped)
    for e in chamfer2_edges_4:
        chamfer2.Add(CHAMFER2_SIZE - 0.0001, CHAMFER2_SIZE_2 - 0.0001, e.wrapped, chamfer2_side_4[0].wrapped)
    for e in chamfer2_edges_5:
        chamfer2.Add(CHAMFER2_SIZE_2 - 0.0001, CHAMFER2_SIZE - 0.0001, e.wrapped, chamfer2_side_5[0].wrapped)
    for e in chamfer2_edges_6:
        chamfer2.Add(CHAMFER2_SIZE - 0.0001, CHAMFER2_SIZE_2 - 0.0001, e.wrapped, chamfer2_side_6[0].wrapped)
    add(Compound.cast(chamfer2.Shape()), mode=Mode.REPLACE)  # a hair under: the kernel refuses the full size

    # Sketch17 → Boss-Extrude9 (add)
    with BuildSketch(Plane.ZY.offset(-1)):
        Circle(SKETCH17_R)
    extrude(amount=BOSS_EXTRUDE9_DEPTH)

    # Fillet3
    fillet3_edges = [part.edges().sort_by_distance(p)[0] for p in [
        (-2, 0, -6.184929539),
    ]]
    fillet(fillet3_edges, radius=FILLET3_R)

    # Sketch19 → Boss-Extrude10 (add)
    with BuildSketch(Plane.ZY.offset(2)):
        Circle(SKETCH19_R)
    extrude(amount=BOSS_EXTRUDE10_DEPTH)

    # Fillet4
    fillet4_edges = [part.edges().sort_by_distance(p)[0] for p in [
        (-5, 0, -2),
    ]]
    fillet(fillet4_edges, radius=FILLET4_R)

    # Sketch20 → Cut-Extrude7 (cut)
    with BuildSketch(Plane.ZY.offset(-1)):
        with BuildLine():
            ThreePointArc((-8.502595121, -2.950572184), (-6.363961031, -6.363961031), (-2.950572184, -8.502595121))
            ThreePointArc((-2.950572184, -8.502595121), (-2.924737516, -7.586524384), (-3.530709504, -6.899028221))
            ThreePointArc((-3.530709504, -6.899028221), (-5.480077554, -5.480077554), (-6.899028221, -3.530709504))
            ThreePointArc((-6.899028221, -3.530709504), (-7.586524384, -2.924737516), (-8.502595121, -2.950572184))
        make_face()
        with BuildLine():
            ThreePointArc((-4.669648054, -9.124521196), (-3.674928455, -9.187215971), (-2.950572184, -8.502595121))
            ThreePointArc((-2.950572184, -8.502595121), (-6.363961031, -6.363961031), (-8.502595121, -2.950572184))
            ThreePointArc((-8.502595121, -2.950572184), (-9.187215971, -3.674928455), (-9.124521196, -4.669648054))
            ThreePointArc((-9.124521196, -4.669648054), (-7.247844507, -7.247844507), (-4.669648054, -9.124521196))
        make_face()
        with BuildLine():
            ThreePointArc((-3.530709504, 6.899028221), (-2.924737516, 7.586524384), (-2.950572184, 8.502595121))
            ThreePointArc((-2.950572184, 8.502595121), (-6.363961031, 6.363961031), (-8.502595121, 2.950572184))
            ThreePointArc((-8.502595121, 2.950572184), (-7.586524384, 2.924737516), (-6.899028221, 3.530709504))
            ThreePointArc((-6.899028221, 3.530709504), (-5.480077554, 5.480077554), (-3.530709504, 6.899028221))
        make_face()
        with BuildLine():
            ThreePointArc((-8.502595121, 2.950572184), (-6.363961031, 6.363961031), (-2.950572184, 8.502595121))
            ThreePointArc((-2.950572184, 8.502595121), (-3.674928455, 9.187215971), (-4.669648054, 9.124521196))
            ThreePointArc((-4.669648054, 9.124521196), (-7.247844507, 7.247844507), (-9.124521196, 4.669648054))
            ThreePointArc((-9.124521196, 4.669648054), (-9.187215971, 3.674928455), (-8.502595121, 2.950572184))
        make_face()
        with BuildLine():
            ThreePointArc((6.899028221, 3.530709504), (7.586524384, 2.924737516), (8.502595121, 2.950572184))
            ThreePointArc((8.502595121, 2.950572184), (6.363961031, 6.363961031), (2.950572184, 8.502595121))
            ThreePointArc((2.950572184, 8.502595121), (2.924737516, 7.586524384), (3.530709504, 6.899028221))
            ThreePointArc((3.530709504, 6.899028221), (5.480077554, 5.480077554), (6.899028221, 3.530709504))
        make_face()
        with BuildLine():
            ThreePointArc((2.950572184, 8.502595121), (6.363961031, 6.363961031), (8.502595121, 2.950572184))
            ThreePointArc((8.502595121, 2.950572184), (9.187215971, 3.674928455), (9.124521196, 4.669648054))
            ThreePointArc((9.124521196, 4.669648054), (7.247844507, 7.247844507), (4.669648054, 9.124521196))
            ThreePointArc((4.669648054, 9.124521196), (3.674928455, 9.187215971), (2.950572184, 8.502595121))
        make_face()
        with BuildLine():
            ThreePointArc((2.950572184, -8.502595121), (6.363961031, -6.363961031), (8.502595121, -2.950572184))
            ThreePointArc((8.502595121, -2.950572184), (7.586524384, -2.924737516), (6.899028221, -3.530709504))
            ThreePointArc((6.899028221, -3.530709504), (5.480077554, -5.480077554), (3.530709504, -6.899028221))
            ThreePointArc((3.530709504, -6.899028221), (2.924737516, -7.586524384), (2.950572184, -8.502595121))
        make_face()
        with BuildLine():
            ThreePointArc((9.124521196, -4.669648054), (9.187215971, -3.674928455), (8.502595121, -2.950572184))
            ThreePointArc((8.502595121, -2.950572184), (6.363961031, -6.363961031), (2.950572184, -8.502595121))
            ThreePointArc((2.950572184, -8.502595121), (3.674928455, -9.187215971), (4.669648054, -9.124521196))
            ThreePointArc((4.669648054, -9.124521196), (7.247844507, -7.247844507), (9.124521196, -4.669648054))
        make_face()
    extrude(amount=-CUT_EXTRUDE7_DEPTH, mode=Mode.SUBTRACT)

    # Sketch22 → Cut-Extrude8 (cut)
    with BuildSketch(Plane(origin=(30, 0, 0), x_dir=(0, 0, -1), z_dir=(1, 0, 0)).offset(CUT_EXTRUDE8_START)):
        Circle(SKETCH22_R)
        Circle(SKETCH22_R_2, mode=Mode.SUBTRACT)
    extrude(amount=CUT_EXTRUDE8_DEPTH, mode=Mode.SUBTRACT)

    # Sketch23 → Cut-Extrude9 (cut)
    with BuildSketch(Plane(origin=(4, 0, 0), x_dir=(0, 0, -1), z_dir=(1, 0, 0))):
        Circle(SKETCH23_R)
        Circle(SKETCH23_R_2, mode=Mode.SUBTRACT)
    extrude(amount=CUT_EXTRUDE9_DEPTH, mode=Mode.SUBTRACT)


solid = part.part
